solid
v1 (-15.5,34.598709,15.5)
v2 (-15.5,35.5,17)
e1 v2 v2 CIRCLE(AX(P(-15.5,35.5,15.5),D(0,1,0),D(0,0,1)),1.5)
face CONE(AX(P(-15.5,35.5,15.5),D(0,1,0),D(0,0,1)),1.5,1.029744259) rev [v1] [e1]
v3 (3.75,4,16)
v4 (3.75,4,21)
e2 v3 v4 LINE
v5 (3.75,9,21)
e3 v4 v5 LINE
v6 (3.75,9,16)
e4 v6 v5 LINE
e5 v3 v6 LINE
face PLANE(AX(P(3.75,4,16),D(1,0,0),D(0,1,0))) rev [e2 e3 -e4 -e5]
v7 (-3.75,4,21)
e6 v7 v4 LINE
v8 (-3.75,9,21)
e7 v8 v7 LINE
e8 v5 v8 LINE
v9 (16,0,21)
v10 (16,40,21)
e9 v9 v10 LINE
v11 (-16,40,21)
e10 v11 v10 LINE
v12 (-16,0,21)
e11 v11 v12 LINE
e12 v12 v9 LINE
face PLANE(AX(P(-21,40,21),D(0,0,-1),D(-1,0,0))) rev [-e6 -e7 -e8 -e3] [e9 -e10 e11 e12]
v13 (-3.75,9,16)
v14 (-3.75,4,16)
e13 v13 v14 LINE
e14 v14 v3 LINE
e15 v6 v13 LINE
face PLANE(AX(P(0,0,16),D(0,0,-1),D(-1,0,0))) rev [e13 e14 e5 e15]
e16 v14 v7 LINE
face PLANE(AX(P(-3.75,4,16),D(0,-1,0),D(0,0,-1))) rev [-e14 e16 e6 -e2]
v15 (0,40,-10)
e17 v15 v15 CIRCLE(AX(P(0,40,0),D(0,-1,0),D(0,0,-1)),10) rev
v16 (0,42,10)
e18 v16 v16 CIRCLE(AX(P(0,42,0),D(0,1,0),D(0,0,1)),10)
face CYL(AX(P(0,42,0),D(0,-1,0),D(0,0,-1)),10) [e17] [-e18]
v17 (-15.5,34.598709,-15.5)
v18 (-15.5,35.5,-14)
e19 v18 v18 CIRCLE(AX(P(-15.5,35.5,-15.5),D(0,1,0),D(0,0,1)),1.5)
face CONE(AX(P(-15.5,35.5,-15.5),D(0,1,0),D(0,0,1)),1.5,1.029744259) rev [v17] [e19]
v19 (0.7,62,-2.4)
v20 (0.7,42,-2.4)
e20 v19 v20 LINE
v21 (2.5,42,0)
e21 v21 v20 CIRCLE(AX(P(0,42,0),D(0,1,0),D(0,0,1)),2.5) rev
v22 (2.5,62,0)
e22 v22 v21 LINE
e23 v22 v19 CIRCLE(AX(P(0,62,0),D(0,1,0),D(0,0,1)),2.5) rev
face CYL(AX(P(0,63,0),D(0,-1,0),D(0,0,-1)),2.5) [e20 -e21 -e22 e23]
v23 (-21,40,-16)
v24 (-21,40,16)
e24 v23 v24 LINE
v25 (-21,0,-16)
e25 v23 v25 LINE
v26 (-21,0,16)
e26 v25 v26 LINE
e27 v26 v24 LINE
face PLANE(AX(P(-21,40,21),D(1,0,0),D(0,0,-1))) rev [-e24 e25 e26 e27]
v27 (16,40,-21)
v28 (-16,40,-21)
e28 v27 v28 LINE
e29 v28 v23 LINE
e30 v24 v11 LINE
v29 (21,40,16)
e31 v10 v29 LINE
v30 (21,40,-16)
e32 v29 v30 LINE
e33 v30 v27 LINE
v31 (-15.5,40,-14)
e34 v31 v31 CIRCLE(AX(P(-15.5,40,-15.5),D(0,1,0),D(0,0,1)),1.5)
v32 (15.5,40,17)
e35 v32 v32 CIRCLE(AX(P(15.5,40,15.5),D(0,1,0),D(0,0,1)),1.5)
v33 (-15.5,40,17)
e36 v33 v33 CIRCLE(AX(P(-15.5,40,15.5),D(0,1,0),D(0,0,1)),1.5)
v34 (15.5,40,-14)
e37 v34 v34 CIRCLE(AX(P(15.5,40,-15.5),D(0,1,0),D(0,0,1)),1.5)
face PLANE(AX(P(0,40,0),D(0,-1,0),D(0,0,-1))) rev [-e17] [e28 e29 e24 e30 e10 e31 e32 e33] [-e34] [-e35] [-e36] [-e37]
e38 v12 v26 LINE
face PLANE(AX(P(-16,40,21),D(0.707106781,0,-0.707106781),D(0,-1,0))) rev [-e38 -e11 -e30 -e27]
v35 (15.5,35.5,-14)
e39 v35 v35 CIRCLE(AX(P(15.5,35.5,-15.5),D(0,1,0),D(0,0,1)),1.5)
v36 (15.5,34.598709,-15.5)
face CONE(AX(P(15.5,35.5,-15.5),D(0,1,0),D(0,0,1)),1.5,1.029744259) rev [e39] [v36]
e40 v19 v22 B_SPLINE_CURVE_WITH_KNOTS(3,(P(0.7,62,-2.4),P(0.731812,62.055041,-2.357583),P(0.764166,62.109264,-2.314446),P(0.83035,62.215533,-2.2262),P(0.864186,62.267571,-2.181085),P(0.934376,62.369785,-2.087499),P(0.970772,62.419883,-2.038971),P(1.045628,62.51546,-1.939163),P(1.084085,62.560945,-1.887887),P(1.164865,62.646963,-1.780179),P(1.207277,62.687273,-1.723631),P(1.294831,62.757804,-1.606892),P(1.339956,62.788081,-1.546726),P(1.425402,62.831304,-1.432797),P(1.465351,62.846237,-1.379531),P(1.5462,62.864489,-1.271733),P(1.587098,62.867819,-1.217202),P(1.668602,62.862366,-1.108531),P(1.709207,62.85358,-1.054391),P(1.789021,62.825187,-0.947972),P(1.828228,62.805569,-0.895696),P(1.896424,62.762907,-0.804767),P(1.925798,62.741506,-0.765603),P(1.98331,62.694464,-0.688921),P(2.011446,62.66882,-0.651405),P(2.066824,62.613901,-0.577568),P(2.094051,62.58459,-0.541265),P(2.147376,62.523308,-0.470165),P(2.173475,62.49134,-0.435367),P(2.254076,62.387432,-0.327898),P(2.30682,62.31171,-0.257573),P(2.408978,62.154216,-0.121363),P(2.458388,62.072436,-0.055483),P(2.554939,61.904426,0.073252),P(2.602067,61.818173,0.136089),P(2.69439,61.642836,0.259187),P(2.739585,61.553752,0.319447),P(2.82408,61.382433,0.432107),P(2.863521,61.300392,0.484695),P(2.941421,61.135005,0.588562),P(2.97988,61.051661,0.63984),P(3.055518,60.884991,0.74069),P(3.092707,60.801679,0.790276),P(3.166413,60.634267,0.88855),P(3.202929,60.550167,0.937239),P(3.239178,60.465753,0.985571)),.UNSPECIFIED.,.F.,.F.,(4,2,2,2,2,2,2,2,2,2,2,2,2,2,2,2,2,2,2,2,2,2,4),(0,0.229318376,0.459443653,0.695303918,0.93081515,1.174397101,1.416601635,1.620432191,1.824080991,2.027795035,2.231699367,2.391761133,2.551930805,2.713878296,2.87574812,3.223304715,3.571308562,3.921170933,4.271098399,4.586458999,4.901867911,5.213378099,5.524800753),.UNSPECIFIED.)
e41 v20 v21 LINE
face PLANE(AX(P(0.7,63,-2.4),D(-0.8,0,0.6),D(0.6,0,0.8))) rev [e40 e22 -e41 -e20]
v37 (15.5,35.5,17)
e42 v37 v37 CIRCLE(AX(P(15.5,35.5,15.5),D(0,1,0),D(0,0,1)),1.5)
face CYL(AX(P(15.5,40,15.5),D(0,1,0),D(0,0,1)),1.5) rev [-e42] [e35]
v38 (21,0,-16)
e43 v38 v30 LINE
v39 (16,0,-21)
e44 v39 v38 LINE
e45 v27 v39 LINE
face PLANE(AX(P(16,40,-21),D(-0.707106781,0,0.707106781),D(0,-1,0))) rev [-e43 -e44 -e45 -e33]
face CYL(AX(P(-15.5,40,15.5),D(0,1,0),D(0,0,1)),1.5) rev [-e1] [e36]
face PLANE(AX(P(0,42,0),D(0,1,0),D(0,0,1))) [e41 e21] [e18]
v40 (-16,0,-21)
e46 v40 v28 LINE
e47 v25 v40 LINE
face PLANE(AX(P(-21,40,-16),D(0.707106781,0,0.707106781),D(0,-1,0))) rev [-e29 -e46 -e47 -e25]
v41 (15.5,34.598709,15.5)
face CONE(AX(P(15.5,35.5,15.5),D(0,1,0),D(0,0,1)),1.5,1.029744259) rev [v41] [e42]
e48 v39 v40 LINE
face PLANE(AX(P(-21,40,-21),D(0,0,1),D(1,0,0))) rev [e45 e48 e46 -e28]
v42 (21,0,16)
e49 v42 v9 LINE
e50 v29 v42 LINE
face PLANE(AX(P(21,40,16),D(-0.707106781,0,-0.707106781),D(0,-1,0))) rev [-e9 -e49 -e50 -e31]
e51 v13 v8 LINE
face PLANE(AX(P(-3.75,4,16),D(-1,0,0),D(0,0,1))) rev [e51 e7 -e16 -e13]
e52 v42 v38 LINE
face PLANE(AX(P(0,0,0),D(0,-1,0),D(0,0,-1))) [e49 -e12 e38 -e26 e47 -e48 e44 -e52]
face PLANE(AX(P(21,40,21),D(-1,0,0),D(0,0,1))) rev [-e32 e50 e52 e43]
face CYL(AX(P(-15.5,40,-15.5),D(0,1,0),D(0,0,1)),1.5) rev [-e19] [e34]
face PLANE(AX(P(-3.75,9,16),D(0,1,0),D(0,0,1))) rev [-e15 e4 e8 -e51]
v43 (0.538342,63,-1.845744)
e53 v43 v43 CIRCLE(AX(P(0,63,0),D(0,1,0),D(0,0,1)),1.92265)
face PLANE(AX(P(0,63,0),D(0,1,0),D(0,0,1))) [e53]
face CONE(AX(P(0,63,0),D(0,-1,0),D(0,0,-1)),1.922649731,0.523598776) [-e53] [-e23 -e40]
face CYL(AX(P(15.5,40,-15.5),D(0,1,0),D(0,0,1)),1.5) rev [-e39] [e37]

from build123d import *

# Parameters (mm, degrees)
SKETCH1_W                 = 42
SKETCH1_H                 = 42
BOSS_EXTRUDE1_DEPTH       = 40
F_3_0MM_DOWEL_HOLE1_D     = 3
F_3_0MM_DOWEL_HOLE1_DEPTH = 4.5
F_3_0MM_DOWEL_HOLE1_TIP   = 0.901290929
SKETCH2_R                 = 10
BOSS_EXTRUDE2_DEPTH       = 2
BOSS_EXTRUDE3_DEPTH       = 23
SKETCH10_W                = 7.5
SKETCH10_H                = 5
CUT_EXTRUDE1_DEPTH        = 5
CHAMFER2_SIZE             = 5


with BuildPart() as part:
    # Sketch1 → Boss-Extrude1 (new body)
    with BuildSketch(Plane(origin=(0, 0, 0), x_dir=(1, 0, 0), z_dir=(0, 1, 0))):
        Rectangle(SKETCH1_W, SKETCH1_H)
    extrude(amount=BOSS_EXTRUDE1_DEPTH)

    # Ø3.0mm Dowel Hole1
    with Locations(Plane(origin=(0, 40, 0), x_dir=(1, 0, 0), z_dir=(0, 1, 0))):
        with Locations((-15.5, 15.5), (15.5, 15.5), (15.5, -15.5), (-15.5, -15.5)):
            Hole(F_3_0MM_DOWEL_HOLE1_D / 2, depth=F_3_0MM_DOWEL_HOLE1_DEPTH)
            with Locations((0, 0, -(F_3_0MM_DOWEL_HOLE1_DEPTH + F_3_0MM_DOWEL_HOLE1_TIP / 2))):  # 118° drill point
                Cone(0, F_3_0MM_DOWEL_HOLE1_D / 2, F_3_0MM_DOWEL_HOLE1_TIP, mode=Mode.SUBTRACT)

    # Sketch2 → Boss-Extrude2 (add)
    with BuildSketch(Plane(origin=(0, 40, 0), x_dir=(1, 0, 0), z_dir=(0, 1, 0))):
        with Locations(Location((0, 0, 0), (0, 0, 90))):
            Circle(SKETCH2_R)
    extrude(amount=BOSS_EXTRUDE2_DEPTH)

    # Sketch4 → Boss-Extrude3 (add)
    with BuildSketch(Plane(origin=(0, 40, 0), x_dir=(1, 0, 0), z_dir=(0, 1, 0))):
        with BuildLine():
            Line((0.7, 2.4), (2.5, 0))
            ThreePointArc((2.5, 0), (-2, -1.5), (0.7, 2.4))
        make_face()
    extrude(amount=BOSS_EXTRUDE3_DEPTH)

    # Sketch10 → Cut-Extrude1 (cut)
    with BuildSketch(Plane.XY.offset(21)):
        with Locations((0, 6.5)):
            Rectangle(SKETCH10_W, SKETCH10_H)
    extrude(amount=-CUT_EXTRUDE1_DEPTH, mode=Mode.SUBTRACT)

    # Chamfer1: read off the stored shape, not the designer's step
    # Chamfer1 outline → Chamfer1 (revolve, cut)
    with BuildSketch(Plane.XY):
        Polygon((2.5, 63), (1.922649731, 63), (2.5, 62), align=None)
    revolve(axis=Axis((0, 0, 0), (0, 1, 0)), mode=Mode.SUBTRACT)

    # Chamfer2
    chamfer2_edges = [part.edges().sort_by_distance(p)[0] for p in [
        (21, 20, 21),
        (-21, 20, 21),
        (-21, 20, -21),
        (21, 20, -21),
    ]]
    chamfer(chamfer2_edges, length=CHAMFER2_SIZE)


solid = part.part
